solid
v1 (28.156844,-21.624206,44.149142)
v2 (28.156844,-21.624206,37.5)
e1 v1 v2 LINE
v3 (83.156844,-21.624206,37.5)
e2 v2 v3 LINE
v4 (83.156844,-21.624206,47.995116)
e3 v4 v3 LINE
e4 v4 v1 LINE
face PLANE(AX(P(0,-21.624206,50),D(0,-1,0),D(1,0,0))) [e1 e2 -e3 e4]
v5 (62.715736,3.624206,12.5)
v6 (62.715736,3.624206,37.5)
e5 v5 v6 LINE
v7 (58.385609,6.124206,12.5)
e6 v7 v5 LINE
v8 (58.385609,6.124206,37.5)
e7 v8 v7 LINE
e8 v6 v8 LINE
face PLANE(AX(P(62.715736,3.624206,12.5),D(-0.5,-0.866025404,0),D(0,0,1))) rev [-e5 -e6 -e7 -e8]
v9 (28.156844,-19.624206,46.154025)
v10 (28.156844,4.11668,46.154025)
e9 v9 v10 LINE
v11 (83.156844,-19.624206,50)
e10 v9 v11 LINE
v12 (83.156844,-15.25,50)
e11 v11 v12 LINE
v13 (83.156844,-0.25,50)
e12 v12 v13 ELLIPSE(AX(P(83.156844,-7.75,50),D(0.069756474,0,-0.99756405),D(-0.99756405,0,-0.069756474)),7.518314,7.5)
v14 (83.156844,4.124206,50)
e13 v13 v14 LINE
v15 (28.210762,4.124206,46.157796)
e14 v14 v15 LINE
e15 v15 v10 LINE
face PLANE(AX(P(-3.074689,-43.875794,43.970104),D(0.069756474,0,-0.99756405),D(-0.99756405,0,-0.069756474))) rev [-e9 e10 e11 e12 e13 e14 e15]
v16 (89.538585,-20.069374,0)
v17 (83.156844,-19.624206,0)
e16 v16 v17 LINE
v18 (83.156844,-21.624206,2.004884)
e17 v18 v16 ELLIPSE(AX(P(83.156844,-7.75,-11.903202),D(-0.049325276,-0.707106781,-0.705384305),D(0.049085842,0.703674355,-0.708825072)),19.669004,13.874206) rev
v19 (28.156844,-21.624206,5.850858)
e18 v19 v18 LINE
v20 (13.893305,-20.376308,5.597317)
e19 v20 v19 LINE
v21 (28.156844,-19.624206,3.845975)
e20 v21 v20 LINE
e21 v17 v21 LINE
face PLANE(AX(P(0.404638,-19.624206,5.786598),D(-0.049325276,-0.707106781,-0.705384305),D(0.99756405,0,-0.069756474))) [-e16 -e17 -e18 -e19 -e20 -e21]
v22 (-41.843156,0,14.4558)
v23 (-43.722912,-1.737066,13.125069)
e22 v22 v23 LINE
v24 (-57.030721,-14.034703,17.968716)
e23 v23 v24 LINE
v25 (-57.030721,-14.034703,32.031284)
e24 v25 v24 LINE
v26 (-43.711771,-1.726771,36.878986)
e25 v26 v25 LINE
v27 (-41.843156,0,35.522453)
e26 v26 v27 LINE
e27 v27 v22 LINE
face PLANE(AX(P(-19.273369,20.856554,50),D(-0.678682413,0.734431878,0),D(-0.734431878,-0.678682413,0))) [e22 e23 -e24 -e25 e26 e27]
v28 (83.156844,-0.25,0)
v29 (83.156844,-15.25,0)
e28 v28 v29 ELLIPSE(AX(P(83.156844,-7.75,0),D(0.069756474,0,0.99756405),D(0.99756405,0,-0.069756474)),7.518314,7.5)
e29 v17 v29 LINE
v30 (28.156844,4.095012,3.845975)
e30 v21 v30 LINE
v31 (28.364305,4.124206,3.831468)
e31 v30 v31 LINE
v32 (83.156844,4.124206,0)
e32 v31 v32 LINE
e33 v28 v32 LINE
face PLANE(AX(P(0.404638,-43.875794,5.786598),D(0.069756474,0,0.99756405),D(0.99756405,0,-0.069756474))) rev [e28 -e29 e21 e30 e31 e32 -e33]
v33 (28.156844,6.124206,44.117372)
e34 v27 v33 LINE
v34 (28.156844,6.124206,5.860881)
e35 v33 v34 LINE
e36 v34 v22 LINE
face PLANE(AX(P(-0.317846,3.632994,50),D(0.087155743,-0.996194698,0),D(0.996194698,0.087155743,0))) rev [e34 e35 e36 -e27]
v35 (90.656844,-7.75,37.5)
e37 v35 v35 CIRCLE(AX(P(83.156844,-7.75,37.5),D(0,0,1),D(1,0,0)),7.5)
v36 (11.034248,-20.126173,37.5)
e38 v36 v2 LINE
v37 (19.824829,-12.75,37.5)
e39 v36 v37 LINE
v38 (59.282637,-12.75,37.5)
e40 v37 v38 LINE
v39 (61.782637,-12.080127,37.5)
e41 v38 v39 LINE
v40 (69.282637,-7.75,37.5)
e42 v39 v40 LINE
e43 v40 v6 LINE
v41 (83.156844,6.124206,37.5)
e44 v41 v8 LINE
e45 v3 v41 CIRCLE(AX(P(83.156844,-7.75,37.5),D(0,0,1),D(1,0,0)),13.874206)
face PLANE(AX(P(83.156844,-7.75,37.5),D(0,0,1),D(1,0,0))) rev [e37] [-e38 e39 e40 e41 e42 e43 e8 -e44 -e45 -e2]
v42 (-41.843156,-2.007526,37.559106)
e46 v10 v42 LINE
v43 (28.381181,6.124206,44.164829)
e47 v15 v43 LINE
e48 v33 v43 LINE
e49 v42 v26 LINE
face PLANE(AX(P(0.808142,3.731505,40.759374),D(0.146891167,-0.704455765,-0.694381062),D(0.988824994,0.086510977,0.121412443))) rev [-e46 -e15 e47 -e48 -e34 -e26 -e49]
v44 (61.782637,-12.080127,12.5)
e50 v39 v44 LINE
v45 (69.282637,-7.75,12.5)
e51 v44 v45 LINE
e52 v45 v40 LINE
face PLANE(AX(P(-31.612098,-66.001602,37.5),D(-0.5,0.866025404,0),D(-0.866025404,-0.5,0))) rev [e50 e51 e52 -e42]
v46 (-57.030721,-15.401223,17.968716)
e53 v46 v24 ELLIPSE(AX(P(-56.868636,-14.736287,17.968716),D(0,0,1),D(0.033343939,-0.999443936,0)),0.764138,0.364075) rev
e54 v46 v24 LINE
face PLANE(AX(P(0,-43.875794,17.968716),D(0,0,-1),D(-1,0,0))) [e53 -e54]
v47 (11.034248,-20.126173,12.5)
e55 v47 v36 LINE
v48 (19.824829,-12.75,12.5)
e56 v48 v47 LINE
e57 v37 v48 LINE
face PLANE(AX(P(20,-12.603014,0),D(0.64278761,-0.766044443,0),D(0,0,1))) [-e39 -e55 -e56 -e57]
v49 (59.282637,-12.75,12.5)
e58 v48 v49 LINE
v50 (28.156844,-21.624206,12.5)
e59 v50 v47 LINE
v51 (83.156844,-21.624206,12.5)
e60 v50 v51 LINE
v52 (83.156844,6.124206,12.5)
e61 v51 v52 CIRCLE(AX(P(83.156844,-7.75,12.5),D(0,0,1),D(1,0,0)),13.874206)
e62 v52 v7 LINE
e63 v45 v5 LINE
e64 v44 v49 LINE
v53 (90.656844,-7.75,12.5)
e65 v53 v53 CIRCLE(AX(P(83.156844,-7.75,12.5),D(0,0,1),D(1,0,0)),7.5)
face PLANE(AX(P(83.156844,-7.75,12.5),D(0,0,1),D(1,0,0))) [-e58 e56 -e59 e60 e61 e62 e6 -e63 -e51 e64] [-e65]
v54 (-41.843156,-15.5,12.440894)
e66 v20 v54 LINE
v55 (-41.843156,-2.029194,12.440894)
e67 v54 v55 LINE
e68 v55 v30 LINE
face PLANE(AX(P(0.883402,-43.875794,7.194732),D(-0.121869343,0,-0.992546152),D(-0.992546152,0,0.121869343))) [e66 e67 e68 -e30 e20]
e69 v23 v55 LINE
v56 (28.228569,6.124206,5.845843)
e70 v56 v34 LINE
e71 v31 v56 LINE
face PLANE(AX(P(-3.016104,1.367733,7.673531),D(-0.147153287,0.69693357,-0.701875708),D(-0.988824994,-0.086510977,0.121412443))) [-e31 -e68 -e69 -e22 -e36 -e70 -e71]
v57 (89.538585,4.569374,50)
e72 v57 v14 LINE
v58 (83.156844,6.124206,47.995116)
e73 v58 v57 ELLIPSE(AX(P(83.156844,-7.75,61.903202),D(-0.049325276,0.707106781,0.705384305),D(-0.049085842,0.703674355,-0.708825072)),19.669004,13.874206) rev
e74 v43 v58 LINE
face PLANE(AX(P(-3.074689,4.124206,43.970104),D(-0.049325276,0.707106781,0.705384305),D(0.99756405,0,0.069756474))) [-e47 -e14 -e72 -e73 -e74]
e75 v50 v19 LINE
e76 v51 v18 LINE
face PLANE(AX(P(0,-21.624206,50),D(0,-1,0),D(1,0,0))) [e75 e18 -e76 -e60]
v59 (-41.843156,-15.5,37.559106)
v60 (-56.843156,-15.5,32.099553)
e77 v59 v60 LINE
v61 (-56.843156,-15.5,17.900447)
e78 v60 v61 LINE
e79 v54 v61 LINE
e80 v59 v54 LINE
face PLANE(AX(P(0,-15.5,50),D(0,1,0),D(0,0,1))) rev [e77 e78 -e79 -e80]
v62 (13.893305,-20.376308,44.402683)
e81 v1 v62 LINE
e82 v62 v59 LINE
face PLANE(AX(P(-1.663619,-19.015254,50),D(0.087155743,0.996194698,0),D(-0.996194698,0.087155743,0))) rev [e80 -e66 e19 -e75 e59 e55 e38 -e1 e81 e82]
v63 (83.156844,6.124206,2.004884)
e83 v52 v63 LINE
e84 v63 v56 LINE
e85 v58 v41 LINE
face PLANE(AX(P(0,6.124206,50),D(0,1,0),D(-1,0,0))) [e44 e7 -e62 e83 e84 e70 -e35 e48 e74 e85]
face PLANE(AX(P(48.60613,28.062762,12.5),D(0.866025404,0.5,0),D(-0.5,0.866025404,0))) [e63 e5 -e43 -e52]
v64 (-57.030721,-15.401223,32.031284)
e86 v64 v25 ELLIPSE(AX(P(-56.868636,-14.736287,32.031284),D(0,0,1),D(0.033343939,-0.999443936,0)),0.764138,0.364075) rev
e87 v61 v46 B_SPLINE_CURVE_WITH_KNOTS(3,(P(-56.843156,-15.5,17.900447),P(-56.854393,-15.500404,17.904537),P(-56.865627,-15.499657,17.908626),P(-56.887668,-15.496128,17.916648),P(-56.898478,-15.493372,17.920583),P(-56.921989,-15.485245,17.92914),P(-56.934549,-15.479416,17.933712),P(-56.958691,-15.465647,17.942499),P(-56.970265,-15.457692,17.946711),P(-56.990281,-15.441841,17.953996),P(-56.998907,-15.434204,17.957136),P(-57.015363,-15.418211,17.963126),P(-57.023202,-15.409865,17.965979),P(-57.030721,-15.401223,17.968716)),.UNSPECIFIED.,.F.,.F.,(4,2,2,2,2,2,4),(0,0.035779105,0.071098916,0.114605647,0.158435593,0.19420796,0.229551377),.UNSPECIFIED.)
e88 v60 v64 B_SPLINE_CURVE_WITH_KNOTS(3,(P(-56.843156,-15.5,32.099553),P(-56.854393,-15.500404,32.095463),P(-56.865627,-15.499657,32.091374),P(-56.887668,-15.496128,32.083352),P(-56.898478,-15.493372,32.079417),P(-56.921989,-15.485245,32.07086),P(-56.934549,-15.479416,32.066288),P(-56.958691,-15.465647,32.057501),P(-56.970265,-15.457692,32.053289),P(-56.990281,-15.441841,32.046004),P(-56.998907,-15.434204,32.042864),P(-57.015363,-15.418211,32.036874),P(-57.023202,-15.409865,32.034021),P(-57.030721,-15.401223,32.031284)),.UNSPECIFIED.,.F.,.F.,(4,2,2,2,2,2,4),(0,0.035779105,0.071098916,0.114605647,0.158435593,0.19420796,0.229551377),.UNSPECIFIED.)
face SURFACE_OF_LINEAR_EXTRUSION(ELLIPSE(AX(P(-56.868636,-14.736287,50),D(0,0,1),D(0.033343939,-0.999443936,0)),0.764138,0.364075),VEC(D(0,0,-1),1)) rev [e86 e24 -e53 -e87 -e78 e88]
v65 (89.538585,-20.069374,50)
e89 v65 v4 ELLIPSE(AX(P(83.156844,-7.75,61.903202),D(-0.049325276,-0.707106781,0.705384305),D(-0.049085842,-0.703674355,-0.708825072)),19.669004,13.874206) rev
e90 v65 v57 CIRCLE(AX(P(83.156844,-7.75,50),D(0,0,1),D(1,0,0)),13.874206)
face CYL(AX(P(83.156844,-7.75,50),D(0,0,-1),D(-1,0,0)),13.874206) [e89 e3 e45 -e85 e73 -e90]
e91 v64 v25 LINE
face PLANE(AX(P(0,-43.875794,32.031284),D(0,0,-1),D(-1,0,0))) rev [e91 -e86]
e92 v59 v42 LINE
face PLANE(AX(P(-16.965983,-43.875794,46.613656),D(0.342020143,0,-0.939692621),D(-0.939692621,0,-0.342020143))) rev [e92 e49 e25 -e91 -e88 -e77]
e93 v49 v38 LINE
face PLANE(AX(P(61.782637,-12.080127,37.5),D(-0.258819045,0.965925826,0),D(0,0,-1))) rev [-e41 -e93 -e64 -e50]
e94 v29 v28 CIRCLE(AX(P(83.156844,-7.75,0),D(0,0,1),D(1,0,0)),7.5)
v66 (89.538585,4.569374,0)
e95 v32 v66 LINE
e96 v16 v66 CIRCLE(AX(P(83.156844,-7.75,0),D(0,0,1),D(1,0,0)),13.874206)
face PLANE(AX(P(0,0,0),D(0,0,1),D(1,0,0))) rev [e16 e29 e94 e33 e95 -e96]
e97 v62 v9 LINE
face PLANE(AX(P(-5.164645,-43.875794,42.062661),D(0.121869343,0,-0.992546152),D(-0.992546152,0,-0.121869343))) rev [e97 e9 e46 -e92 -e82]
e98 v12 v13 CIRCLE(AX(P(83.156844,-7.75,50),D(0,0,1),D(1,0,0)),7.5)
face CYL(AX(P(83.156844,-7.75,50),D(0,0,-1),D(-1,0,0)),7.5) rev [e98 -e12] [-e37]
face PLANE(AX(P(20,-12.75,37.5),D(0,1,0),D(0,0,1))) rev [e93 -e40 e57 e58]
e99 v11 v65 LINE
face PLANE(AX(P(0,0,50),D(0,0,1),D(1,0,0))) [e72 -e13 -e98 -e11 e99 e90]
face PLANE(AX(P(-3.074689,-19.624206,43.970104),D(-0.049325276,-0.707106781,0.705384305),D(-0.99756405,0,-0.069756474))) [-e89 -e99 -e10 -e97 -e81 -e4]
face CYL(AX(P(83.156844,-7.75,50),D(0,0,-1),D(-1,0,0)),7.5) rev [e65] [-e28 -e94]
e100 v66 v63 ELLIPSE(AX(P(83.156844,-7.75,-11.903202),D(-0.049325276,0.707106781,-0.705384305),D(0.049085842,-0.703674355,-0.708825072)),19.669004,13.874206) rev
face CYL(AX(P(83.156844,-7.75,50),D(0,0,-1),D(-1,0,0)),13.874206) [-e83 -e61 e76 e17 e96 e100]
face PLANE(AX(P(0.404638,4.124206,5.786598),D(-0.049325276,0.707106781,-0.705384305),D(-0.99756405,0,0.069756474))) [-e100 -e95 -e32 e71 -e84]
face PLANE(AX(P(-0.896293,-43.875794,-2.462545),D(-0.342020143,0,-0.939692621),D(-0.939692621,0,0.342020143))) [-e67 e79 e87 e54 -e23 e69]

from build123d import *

# Parameters (mm, degrees)
CROQUIS1_W              = 20
CROQUIS1_H              = 27.748412894
CROQUIS1_R              = 7.5
SALIENTE_EXTRUIR1_DEPTH = 50
CORTAR_EXTRUIR4_DEPTH   = 50
CORTAR_EXTRUIR6_DEPTH   = 12.5
CHAFL_N3_START          = -1
CHAFL_N3_OUTLINE_W      = 79
CHAFL_N3_OUTLINE_H      = 9
CHAFL_N3_DEPTH          = 2.185479897
CHAFL_N4_SIZE           = 2
CHAFL_N4_SIZE_2         = 2.02158655
CHAFL_N5_START          = -33
CHAFL_N5_OUTLINE_W      = 90
CHAFL_N5_OUTLINE_H      = 7
CHAFL_N5_DEPTH          = 2.187491538
CHAFL_N6_START          = -47
CHAFL_N6_OUTLINE_W      = 78
CHAFL_N6_OUTLINE_H      = 9
CHAFL_N6_DEPTH          = 1.956109558
CHAFL_N9_START          = -12
CHAFL_N9_OUTLINE_W      = 79
CHAFL_N9_OUTLINE_H      = 9
CHAFL_N9_DEPTH          = 2.225324788
CHAFL_N10_START         = -36
CHAFL_N10_OUTLINE_W     = 65
CHAFL_N10_OUTLINE_H     = 9
CHAFL_N10_DEPTH         = 1.916264666
CROQUIS17_W             = 6
CROQUIS17_H             = 25
CORTAR_EXTRUIR8_DEPTH   = 50
CORTAR_EXTRUIR9_DEPTH   = 12.5
CORTAR_EXTRUIR10_DEPTH  = 12.5
CROQUIS22_W             = 25
CROQUIS22_H             = 11.323267037
CORTAR_EXTRUIR11_DEPTH  = 128.16446319
CROQUIS23_W             = 25
CROQUIS23_H             = 16.343664216
CORTAR_EXTRUIR12_DEPTH  = 80
CHAFL_N17_SIZE          = 9
CHAFL_N17_SIZE_2        = 8.307561118


with BuildPart() as part:
    # Croquis1 → Saliente-Extruir1 (new body)
    # profile 1 of 4: a face of its own
    with BuildSketch(Plane.XY):
        with BuildLine():
            Line((-57.030721287, -14.034703102), (-41.84315615, 0))
            Line((-41.84315615, 0), (-41.84315615, -15.5))
            Line((-41.84315615, -15.5), (-56.84315615, -15.5))
            add(Edge.make_bspline(
                [(-57.030721287, -14.034703102), (-57.299191115, -14.282793846), (-57.220648616, -14.896383781), (-57.142106118, -15.509973716), (-56.84315615, -15.5)],
                knots=[0.390549282, 0.390549282, 0.390549282, 1.766070968, 1.766070968, 3.141592654, 3.141592654, 3.141592654], degree=2, weights=[1, 0.772669387, 1, 0.772669387, 1]))
        make_face()
    # profile 2 of 4: a face of its own
    with BuildSketch(Plane.XY):
        Polygon((28.15684385, -21.624206447), (28.15684385, 6.124206447), (-41.84315615, 0), (-41.84315615, -15.5), align=None)
    # profile 3 of 4: a face of its own
    with BuildSketch(Plane.XY):
        with Locations((38.15684385, -7.75)):
            Rectangle(CROQUIS1_W, CROQUIS1_H)
    # profile 4 of 4: a face of its own
    with BuildSketch(Plane.XY):
        with BuildLine():
            Line((48.15684385, -21.624206447), (83.15684385, -21.624206447))
            ThreePointArc((83.15684385, -21.624206447), (97.031050296, -7.75), (83.15684385, 6.124206447))
            Line((83.15684385, 6.124206447), (48.15684385, 6.124206447))
            Line((48.15684385, 6.124206447), (48.15684385, -21.624206447))
        make_face()
        with Locations((83.15684385, -7.75)):
            Circle(CROQUIS1_R, mode=Mode.SUBTRACT)
    extrude(amount=SALIENTE_EXTRUIR1_DEPTH)

    # Croquis6 → Cortar-Extruir4 (cut)
    with BuildSketch(Plane(origin=(0, 6.124206447, 0), x_dir=(1, 0, 0), z_dir=(0, 1, 0))):
        Polygon((83.15684385, 0), (28.15684385, 0), (28.15684385, -3.845974657), align=None)
        Polygon((83.15684385, -50), (28.15684385, -46.154025343), (28.15684385, -50), align=None)
        Polygon((28.15684385, -50), (28.15684385, -46.154025343), (-41.84315615, -37.55910608), (-41.84315615, -50), align=None)
        Polygon((28.15684385, -3.845974657), (28.15684385, 0), (-41.84315615, 0), (-41.84315615, -12.44089392), align=None)
        Polygon((-57.233399119, 0), (-41.84315615, 0), (-41.84315615, -12.44089392), (-57.030721287, -17.968715561), (-57.233399119, -17.968715561), align=None)
        Polygon((-57.233399119, -32.031284439), (-57.233399119, -50), (-41.84315615, -50), (-41.84315615, -37.55910608), (-57.030721287, -32.031284439), align=None)
    extrude(amount=-CORTAR_EXTRUIR4_DEPTH, mode=Mode.SUBTRACT)

    # Croquis10 → Cortar-Extruir6 (cut, symmetric)
    with BuildSketch(Plane.XY.offset(25)):
        with BuildLine():
            Line((83.15684385, 6.124206447), (75.731562774, 6.124206447))
            Line((75.731562774, 6.124206447), (75.731562774, 3.970017299))
            ThreePointArc((75.731562774, 3.970017299), (69.289041207, -8.171490688), (76.457035077, -19.899327839))
            Line((76.457035077, -19.899327839), (76.457035077, -21.624206447))
            Line((76.457035077, -21.624206447), (83.15684385, -21.624206447))
            ThreePointArc((83.15684385, -21.624206447), (97.031050296, -7.75), (83.15684385, 6.124206447))
        make_face()
    extrude(amount=CORTAR_EXTRUIR6_DEPTH, both=True, mode=Mode.SUBTRACT)

    # Chaflán3: read off the stored shape, not the designer's step
    # Chaflán3 outline → Chaflán3 (cut)
    with BuildSketch(Plane(origin=(0, 0, 0), x_dir=(0.9987827677655402, 0.0349207435267313, -0.034835678350610806), z_dir=(0.04932527561612769, -0.7071067811865458, 0.7053843046066418)).offset(CHAFL_N3_START)):
        with Locations((51.5, 5.5)):
            Rectangle(CHAFL_N3_OUTLINE_W, CHAFL_N3_OUTLINE_H)
    extrude(amount=CHAFL_N3_DEPTH, mode=Mode.SUBTRACT)

    # Chaflán4
    # the kernel refuses this chamfer: 2.02158655, 2 mm, written as the material it takes off along each edge
    with BuildSketch(Plane(origin=(29.320006018, 6.22596995, 3.703156301), x_dir=(0.1209504317481252, 0.010581791626527273, 0.9926021452454729), z_dir=(-0.9888249944080325, -0.08651097722179166, 0.1214124427482008))) as chafl_n4_piece_1:
        Polygon((CHAFL_N4_SIZE, 0), (-CHAFL_N4_SIZE_2 * 0.0106216131418, -CHAFL_N4_SIZE_2 * 0.999943588993), (0, 0), align=None)
    extrude(amount=87.568441366, mode=Mode.SUBTRACT)

    # Chaflán5: read off the stored shape, not the designer's step
    # Chaflán5 outline → Chaflán5 (cut)
    with BuildSketch(Plane(origin=(0, 0, 0), x_dir=(0.9891526601001411, 0.10461310355007251, 0.1031169897855652), z_dir=(0.14689116725254298, -0.7044557654033778, -0.6943810622224129)).offset(CHAFL_N5_START)):
        with Locations((4, 27.5)):
            Rectangle(CHAFL_N5_OUTLINE_W, CHAFL_N5_OUTLINE_H)
    extrude(amount=CHAFL_N5_DEPTH, mode=Mode.SUBTRACT)

    # Chaflán6: read off the stored shape, not the designer's step
    # Chaflán6 outline → Chaflán6 (cut)
    with BuildSketch(Plane(origin=(0, 0, 0), x_dir=(0.9987827677655402, -0.034920743526731114, 0.03483567835061047), z_dir=(0.04932527561612732, 0.7071067811865474, -0.7053843046066404)).offset(CHAFL_N6_START)):
        with Locations((54, -18.5)):
            Rectangle(CHAFL_N6_OUTLINE_W, CHAFL_N6_OUTLINE_H)
    extrude(amount=CHAFL_N6_DEPTH, mode=Mode.SUBTRACT)

    # Chaflán9: read off the stored shape, not the designer's step
    # Chaflán9 outline → Chaflán9 (cut)
    with BuildSketch(Plane(origin=(0, 0, 0), x_dir=(0.9987827677655402, -0.03492074352673121, -0.03483567835061067), z_dir=(0.049325275616127526, 0.7071067811865464, 0.7053843046066414)).offset(CHAFL_N9_START)):
        with Locations((52.5, -16.5)):
            Rectangle(CHAFL_N9_OUTLINE_W, CHAFL_N9_OUTLINE_H)
    extrude(amount=CHAFL_N9_DEPTH, mode=Mode.SUBTRACT)

    # Chaflán10: read off the stored shape, not the designer's step
    # Chaflán10 outline → Chaflán10 (cut)
    with BuildSketch(Plane(origin=(0, 0, 0), x_dir=(0.9987827677655402, 0.03492074352673113, 0.034835678350610584), z_dir=(0.049325275616127415, -0.7071067811865462, -0.7053843046066413)).offset(CHAFL_N10_START)):
        with Locations((60.5, 29.5)):
            Rectangle(CHAFL_N10_OUTLINE_W, CHAFL_N10_OUTLINE_H)
    extrude(amount=CHAFL_N10_DEPTH, mode=Mode.SUBTRACT)

    # Croquis17 → Cortar-Extruir8 (cut, symmetric)
    with BuildSketch(Plane(origin=(0, 0, 0), x_dir=(1, 0, 0), z_dir=(0, 1, 0))):
        with Locations((76.444203312, -25)):
            Rectangle(CROQUIS17_W, CROQUIS17_H)
    extrude(amount=CORTAR_EXTRUIR8_DEPTH, both=True, mode=Mode.SUBTRACT)

    # Croquis19 → Cortar-Extruir9 (cut, symmetric)
    with BuildSketch(Plane.XY.offset(25)):
        Polygon((83.15684385, 6.124206447), (83.15684385, -7.75), (63.342423567, 6.124206447), align=None)
        Polygon((63.342423567, -21.624206447), (83.15684385, -7.75), (83.15684385, -21.624206447), align=None)
    extrude(amount=CORTAR_EXTRUIR9_DEPTH, both=True, mode=Mode.SUBTRACT)

    # Croquis20 → Cortar-Extruir10 (cut, symmetric)
    with BuildSketch(Plane.XY.offset(25)):
        with BuildLine():
            Line((61.272360576, 6.124206447), (69.282637403, -7.75))
            ThreePointArc((69.282637403, -7.75), (73.346298387, 2.060545462), (83.15684385, 6.124206447))
            Line((83.15684385, 6.124206447), (61.272360576, 6.124206447))
        make_face()
        with BuildLine():
            ThreePointArc((83.15684385, -21.624206447), (73.346298387, -17.560545462), (69.282637403, -7.75))
            Line((69.282637403, -7.75), (61.272360576, -21.624206447))
            Line((61.272360576, -21.624206447), (83.15684385, -21.624206447))
        make_face()
    extrude(amount=CORTAR_EXTRUIR10_DEPTH, both=True, mode=Mode.SUBTRACT)

    # Croquis22 → Cortar-Extruir11 (cut, through all)
    with BuildSketch(Plane(origin=(48.606129612, 28.062762016, 0), x_dir=(0, 0, -1), z_dir=(0.866025403784436, 0.5000000000000046, 0))):
        with Locations((-25, -47.0146491)):
            Rectangle(CROQUIS22_W, CROQUIS22_H)
    extrude(amount=-CORTAR_EXTRUIR11_DEPTH, mode=Mode.SUBTRACT)

    # Croquis23 → Cortar-Extruir12 (cut)
    with BuildSketch(Plane(origin=(100, 0, 0), x_dir=(0, 0, -1), z_dir=(1, 0, 0))):
        with Locations((-25, -20.921832108)):
            Rectangle(CROQUIS23_W, CROQUIS23_H)
    extrude(amount=-CORTAR_EXTRUIR12_DEPTH, mode=Mode.SUBTRACT)

    # Chaflán14
    # the kernel refuses this chamfer: 5 mm, written as the material it takes off along each edge
    with BuildSketch(Plane(origin=(60.622383365, -12.75, 37.5), x_dir=(0.8660254037844363, 0.5000000000000041, 0), z_dir=(0, 0, -1))) as chafl_n14_piece_1:
        with BuildLine():
            Line((1.532931127, 0.051763809), (-1.353439203, -0.72163679))
            Line((-1.353439203, -0.72163679), (-1.403439203, -0.63503425))
            ThreePointArc((-1.403439203, -0.63503425), (-0.713778649, -0.296630241), (-0.05, 0.08660254))
            Line((-0.05, 0.08660254), (0, 0.1))
            ThreePointArc((0, 0.1), (0.766465564, 0.1), (1.532931127, 0.151763809))
            Line((1.532931127, 0.151763809), (1.532931127, 0.051763809))
        make_face()
    extrude(amount=25, mode=Mode.SUBTRACT)

    # Chaflán15
    # the kernel refuses this chamfer: 5 mm, written as the material it takes off along each edge
    with BuildSketch(Plane(origin=(61.272360576, 6.124206447, 12.5), x_dir=(-1, 0, 0), z_dir=(0, 0, 1))) as chafl_n15_piece_1:
        with BuildLine():
            Line((3.059956427, -0.1), (-1.616580754, 2.6))
            Line((-1.616580754, 2.6), (-1.703183294, 2.55))
            ThreePointArc((-1.703183294, 2.55), (-0.851591647, 1.275), (-0.08660254, -0.05))
            Line((-0.08660254, -0.05), (0, -0.1))
            ThreePointArc((0, -0.1), (1.529978213, -0.1), (3.059956427, -0.2))
            Line((3.059956427, -0.2), (3.059956427, -0.1))
        make_face()
    extrude(amount=25, mode=Mode.SUBTRACT)

    # Chaflán17
    # the kernel refuses this chamfer: 9, 8.307561118 mm, written as the material it takes off along each edge
    with BuildSketch(Plane(origin=(20, -20.91057508, 12.5), x_dir=(-0.9961946980917451, 0.08715574274766211, 0), z_dir=(0, 0, 1))) as chafl_n17_piece_1_section:
        Polygon((CHAFL_N17_SIZE, 0), (CHAFL_N17_SIZE_2 * 0.0871557427526, -CHAFL_N17_SIZE_2 * 0.996194698149), (0, 0), align=None)
    chafl_n17_piece_1 = extrude(amount=25, mode=Mode.PRIVATE)
    chafl_n17_piece_1 = split(chafl_n17_piece_1, bisect_by=Plane(origin=(20, -12.75, 12.5), z_dir=(0, -1, 0)), keep=Keep.TOP, mode=Mode.PRIVATE)
    add(chafl_n17_piece_1, mode=Mode.SUBTRACT)


solid = part.part
